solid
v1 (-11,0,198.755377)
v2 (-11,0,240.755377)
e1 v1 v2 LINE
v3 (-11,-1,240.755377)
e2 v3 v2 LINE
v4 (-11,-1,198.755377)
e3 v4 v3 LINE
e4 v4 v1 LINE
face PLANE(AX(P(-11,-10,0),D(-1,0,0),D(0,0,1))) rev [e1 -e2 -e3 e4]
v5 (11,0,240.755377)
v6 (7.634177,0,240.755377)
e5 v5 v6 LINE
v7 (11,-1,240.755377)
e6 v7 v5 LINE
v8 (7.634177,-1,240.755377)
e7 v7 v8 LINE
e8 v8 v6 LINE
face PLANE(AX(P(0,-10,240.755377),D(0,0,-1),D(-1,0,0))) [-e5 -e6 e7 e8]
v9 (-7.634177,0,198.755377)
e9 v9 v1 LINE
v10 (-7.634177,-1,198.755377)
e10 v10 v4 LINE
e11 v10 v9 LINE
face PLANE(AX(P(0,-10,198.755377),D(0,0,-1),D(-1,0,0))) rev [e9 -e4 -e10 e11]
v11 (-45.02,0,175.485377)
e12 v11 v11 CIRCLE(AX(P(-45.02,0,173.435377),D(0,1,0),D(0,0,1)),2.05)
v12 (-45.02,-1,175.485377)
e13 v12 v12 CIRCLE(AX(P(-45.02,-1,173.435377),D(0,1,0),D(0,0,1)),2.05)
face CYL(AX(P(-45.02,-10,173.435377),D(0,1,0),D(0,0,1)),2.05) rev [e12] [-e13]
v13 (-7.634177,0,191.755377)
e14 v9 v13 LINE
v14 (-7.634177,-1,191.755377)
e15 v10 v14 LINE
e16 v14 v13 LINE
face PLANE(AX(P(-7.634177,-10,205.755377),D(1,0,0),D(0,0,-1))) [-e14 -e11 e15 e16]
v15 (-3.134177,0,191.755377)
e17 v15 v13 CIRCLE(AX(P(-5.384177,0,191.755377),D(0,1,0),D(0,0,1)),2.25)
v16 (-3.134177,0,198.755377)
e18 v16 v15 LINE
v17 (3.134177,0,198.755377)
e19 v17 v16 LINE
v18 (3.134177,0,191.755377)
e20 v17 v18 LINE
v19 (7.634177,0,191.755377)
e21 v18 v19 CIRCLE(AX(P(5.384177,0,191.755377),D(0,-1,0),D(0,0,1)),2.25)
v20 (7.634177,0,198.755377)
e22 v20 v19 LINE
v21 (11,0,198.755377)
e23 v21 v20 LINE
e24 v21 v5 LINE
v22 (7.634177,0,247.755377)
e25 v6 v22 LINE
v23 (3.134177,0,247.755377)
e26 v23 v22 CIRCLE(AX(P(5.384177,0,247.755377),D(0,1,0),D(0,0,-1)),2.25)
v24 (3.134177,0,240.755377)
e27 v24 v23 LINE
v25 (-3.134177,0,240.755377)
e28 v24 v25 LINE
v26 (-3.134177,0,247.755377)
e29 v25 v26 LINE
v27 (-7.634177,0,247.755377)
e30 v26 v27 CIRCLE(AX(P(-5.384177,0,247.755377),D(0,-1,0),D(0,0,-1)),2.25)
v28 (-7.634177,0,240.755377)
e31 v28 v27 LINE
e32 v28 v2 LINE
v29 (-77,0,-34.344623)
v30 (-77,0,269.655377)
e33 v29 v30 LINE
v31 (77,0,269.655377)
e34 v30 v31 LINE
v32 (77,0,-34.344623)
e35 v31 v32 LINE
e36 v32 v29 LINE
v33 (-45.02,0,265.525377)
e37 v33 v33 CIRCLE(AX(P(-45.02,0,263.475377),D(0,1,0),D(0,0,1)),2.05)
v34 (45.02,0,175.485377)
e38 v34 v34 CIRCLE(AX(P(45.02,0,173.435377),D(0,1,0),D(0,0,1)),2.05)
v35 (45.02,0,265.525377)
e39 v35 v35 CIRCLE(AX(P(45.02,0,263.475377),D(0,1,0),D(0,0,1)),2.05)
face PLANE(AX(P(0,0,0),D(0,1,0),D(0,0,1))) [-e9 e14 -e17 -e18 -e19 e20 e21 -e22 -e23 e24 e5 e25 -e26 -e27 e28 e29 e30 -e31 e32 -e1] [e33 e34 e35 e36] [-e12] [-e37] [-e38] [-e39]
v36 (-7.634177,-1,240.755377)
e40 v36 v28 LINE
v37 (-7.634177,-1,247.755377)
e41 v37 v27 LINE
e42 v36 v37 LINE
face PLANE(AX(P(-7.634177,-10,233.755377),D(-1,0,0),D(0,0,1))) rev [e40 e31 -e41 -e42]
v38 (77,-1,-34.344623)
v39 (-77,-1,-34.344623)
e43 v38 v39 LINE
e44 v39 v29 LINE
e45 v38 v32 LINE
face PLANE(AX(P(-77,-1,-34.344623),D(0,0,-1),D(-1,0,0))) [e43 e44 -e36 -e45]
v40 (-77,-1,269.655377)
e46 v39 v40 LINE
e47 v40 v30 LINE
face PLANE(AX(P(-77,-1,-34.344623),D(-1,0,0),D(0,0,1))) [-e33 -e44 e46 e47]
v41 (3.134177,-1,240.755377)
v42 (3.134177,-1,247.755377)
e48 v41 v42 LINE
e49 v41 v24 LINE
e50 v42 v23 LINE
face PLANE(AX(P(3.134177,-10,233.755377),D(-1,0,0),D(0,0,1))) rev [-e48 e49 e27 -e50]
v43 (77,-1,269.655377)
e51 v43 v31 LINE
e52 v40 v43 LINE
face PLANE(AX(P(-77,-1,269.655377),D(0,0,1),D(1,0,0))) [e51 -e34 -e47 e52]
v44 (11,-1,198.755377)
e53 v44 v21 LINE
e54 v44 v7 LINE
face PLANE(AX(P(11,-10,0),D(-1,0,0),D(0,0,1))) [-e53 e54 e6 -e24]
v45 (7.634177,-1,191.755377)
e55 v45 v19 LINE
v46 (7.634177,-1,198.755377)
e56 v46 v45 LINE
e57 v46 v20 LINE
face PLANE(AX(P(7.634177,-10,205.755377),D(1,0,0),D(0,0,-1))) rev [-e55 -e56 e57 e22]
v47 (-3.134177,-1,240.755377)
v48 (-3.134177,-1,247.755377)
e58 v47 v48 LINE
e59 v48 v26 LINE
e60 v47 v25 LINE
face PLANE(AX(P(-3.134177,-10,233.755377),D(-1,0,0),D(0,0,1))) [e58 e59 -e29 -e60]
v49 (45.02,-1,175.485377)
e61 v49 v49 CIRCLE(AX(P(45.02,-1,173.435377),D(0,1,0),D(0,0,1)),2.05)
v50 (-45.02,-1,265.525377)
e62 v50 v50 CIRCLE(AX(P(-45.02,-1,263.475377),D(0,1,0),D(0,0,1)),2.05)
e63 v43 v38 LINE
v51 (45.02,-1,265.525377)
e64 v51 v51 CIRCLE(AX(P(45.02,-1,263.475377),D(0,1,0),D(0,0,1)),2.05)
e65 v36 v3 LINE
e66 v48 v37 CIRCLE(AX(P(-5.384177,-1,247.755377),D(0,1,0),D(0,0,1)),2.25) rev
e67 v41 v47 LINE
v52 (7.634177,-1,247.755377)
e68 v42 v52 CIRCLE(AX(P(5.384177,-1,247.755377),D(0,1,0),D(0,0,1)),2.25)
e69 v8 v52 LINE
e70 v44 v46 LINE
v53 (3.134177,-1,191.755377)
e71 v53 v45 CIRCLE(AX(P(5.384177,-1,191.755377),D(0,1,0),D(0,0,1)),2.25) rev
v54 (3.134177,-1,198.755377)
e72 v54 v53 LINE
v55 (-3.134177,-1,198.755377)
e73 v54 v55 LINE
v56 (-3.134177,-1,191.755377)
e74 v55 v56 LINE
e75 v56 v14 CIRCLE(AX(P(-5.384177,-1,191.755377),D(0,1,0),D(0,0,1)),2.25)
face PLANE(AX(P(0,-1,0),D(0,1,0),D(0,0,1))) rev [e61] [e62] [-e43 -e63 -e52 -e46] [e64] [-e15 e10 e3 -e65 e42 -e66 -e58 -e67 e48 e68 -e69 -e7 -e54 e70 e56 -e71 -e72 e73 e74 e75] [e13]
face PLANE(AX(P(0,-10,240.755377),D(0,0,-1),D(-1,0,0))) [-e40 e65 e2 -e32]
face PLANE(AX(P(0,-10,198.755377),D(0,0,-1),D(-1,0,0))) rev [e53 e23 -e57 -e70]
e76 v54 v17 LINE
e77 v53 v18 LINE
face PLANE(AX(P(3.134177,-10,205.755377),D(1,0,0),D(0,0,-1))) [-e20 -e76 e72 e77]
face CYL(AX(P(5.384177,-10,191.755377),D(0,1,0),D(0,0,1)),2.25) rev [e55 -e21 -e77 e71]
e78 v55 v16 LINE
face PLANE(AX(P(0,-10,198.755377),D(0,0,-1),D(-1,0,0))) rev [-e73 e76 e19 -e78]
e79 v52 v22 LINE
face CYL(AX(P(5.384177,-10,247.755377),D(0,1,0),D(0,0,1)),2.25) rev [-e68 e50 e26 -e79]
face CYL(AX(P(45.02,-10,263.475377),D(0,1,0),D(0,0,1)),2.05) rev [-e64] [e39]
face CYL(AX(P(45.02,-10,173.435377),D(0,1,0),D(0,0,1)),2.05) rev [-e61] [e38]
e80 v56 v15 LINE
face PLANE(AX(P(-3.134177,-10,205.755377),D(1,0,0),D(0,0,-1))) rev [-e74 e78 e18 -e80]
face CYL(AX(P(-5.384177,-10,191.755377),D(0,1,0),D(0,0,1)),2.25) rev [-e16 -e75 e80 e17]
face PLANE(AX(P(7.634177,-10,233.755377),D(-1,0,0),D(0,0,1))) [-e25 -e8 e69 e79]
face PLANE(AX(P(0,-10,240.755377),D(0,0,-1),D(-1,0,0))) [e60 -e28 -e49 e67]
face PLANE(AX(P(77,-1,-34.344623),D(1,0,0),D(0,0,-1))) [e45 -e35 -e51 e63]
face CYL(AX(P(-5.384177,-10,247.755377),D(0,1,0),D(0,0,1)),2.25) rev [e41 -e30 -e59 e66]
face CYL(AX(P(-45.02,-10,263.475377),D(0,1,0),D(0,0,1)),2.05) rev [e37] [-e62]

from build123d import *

# Parameters (mm, degrees)
SKETCH1_W               = 154
SKETCH1_H               = 304
BASE_FLANGE1_DEPTH      = 1
SKETCH4_W               = 22
SKETCH4_H               = 42
CUT_EXTRUDE3_DEPTH      = 10
MIRROR2_COPY_1_SKETCH_W = 22
MIRROR2_COPY_1_SKETCH_H = 42
MIRROR2_COPY_1_DEPTH    = 10
SKETCH2_R               = 2.05
CUT_EXTRUDE4_DEPTH      = 10


# Sheet-metal steps are written as plain solids
with BuildPart() as part:
    # Sketch1 → Base-Flange1 (new body)
    with BuildSketch(Plane(origin=(0, 0, 0), x_dir=(1, 0, 0), z_dir=(0, 1, 0))):
        with Locations((0, -117.655376963)):
            Rectangle(SKETCH1_W, SKETCH1_H)
    extrude(amount=-BASE_FLANGE1_DEPTH)

    # Sketch4 → Cut-Extrude3 (cut)
    with BuildSketch(Plane(origin=(0, 0, 0), x_dir=(1, 0, 0), z_dir=(0, 1, 0))):
        with Locations((0, -219.755376963)):
            Rectangle(SKETCH4_W, SKETCH4_H)
        with BuildLine():
            Line((-7.634176778, -205.755376963), (-7.634176778, -191.755376963))
            ThreePointArc((-7.634176778, -191.755376963), (-5.384176778, -189.505376963), (-3.134176778, -191.755376963))
            Line((-3.134176778, -191.755376963), (-3.134176778, -205.755376963))
            ThreePointArc((-3.134176778, -205.755376963), (-5.384176778, -208.005376963), (-7.634176778, -205.755376963))
        make_face()
    cut_extrude3 = extrude(amount=-CUT_EXTRUDE3_DEPTH, mode=Mode.SUBTRACT)

    # Mirror1: Cut-Extrude3 across plane
    add(cut_extrude3.mirror(Plane(origin=(0, 0, 0), x_dir=(0, 0, 1), z_dir=(1, 0, 0))), mode=Mode.SUBTRACT)

    # Mirror2: Cut-Extrude3 across plane
    add(cut_extrude3.mirror(Plane(origin=(0, 0, 219.755376963), x_dir=(1, 0, 0), z_dir=(0, 0, -1))), mode=Mode.SUBTRACT)

    # Mirror2 copy 1 sketch → Mirror2 copy 1 (cut)
    with BuildSketch(Plane(origin=(0, 0, 439.510753926), x_dir=(-1, 0, 0), z_dir=(0, 1, 0))):
        with Locations((0, -219.755376963)):
            Rectangle(MIRROR2_COPY_1_SKETCH_W, MIRROR2_COPY_1_SKETCH_H)
        with BuildLine():
            Line((-7.634176778, -205.755376963), (-7.634176778, -191.755376963))
            ThreePointArc((-7.634176778, -191.755376963), (-5.384176778, -189.505376963), (-3.134176778, -191.755376963))
            Line((-3.134176778, -191.755376963), (-3.134176778, -205.755376963))
            ThreePointArc((-3.134176778, -205.755376963), (-5.384176778, -208.005376963), (-7.634176778, -205.755376963))
        make_face()
    extrude(amount=-MIRROR2_COPY_1_DEPTH, mode=Mode.SUBTRACT)

    # Sketch2 → Cut-Extrude4 (cut)
    with BuildSketch(Plane(origin=(0, 0, 0), x_dir=(1, 0, 0), z_dir=(0, 1, 0))):
        with Locations(Location((-45.02, -263.475376963, 0), (0, 0, 270))):
            Circle(SKETCH2_R)
        with Locations(Location((-45.02, -173.435376963, 0), (0, 0, 270))):
            Circle(SKETCH2_R)
        with Locations(Location((45.02, -173.435376963, 0), (0, 0, 270))):
            Circle(SKETCH2_R)
        with Locations(Location((45.02, -263.475376963, 0), (0, 0, 270))):
            Circle(SKETCH2_R)
    extrude(amount=-CUT_EXTRUDE4_DEPTH, mode=Mode.SUBTRACT)


solid = part.part
